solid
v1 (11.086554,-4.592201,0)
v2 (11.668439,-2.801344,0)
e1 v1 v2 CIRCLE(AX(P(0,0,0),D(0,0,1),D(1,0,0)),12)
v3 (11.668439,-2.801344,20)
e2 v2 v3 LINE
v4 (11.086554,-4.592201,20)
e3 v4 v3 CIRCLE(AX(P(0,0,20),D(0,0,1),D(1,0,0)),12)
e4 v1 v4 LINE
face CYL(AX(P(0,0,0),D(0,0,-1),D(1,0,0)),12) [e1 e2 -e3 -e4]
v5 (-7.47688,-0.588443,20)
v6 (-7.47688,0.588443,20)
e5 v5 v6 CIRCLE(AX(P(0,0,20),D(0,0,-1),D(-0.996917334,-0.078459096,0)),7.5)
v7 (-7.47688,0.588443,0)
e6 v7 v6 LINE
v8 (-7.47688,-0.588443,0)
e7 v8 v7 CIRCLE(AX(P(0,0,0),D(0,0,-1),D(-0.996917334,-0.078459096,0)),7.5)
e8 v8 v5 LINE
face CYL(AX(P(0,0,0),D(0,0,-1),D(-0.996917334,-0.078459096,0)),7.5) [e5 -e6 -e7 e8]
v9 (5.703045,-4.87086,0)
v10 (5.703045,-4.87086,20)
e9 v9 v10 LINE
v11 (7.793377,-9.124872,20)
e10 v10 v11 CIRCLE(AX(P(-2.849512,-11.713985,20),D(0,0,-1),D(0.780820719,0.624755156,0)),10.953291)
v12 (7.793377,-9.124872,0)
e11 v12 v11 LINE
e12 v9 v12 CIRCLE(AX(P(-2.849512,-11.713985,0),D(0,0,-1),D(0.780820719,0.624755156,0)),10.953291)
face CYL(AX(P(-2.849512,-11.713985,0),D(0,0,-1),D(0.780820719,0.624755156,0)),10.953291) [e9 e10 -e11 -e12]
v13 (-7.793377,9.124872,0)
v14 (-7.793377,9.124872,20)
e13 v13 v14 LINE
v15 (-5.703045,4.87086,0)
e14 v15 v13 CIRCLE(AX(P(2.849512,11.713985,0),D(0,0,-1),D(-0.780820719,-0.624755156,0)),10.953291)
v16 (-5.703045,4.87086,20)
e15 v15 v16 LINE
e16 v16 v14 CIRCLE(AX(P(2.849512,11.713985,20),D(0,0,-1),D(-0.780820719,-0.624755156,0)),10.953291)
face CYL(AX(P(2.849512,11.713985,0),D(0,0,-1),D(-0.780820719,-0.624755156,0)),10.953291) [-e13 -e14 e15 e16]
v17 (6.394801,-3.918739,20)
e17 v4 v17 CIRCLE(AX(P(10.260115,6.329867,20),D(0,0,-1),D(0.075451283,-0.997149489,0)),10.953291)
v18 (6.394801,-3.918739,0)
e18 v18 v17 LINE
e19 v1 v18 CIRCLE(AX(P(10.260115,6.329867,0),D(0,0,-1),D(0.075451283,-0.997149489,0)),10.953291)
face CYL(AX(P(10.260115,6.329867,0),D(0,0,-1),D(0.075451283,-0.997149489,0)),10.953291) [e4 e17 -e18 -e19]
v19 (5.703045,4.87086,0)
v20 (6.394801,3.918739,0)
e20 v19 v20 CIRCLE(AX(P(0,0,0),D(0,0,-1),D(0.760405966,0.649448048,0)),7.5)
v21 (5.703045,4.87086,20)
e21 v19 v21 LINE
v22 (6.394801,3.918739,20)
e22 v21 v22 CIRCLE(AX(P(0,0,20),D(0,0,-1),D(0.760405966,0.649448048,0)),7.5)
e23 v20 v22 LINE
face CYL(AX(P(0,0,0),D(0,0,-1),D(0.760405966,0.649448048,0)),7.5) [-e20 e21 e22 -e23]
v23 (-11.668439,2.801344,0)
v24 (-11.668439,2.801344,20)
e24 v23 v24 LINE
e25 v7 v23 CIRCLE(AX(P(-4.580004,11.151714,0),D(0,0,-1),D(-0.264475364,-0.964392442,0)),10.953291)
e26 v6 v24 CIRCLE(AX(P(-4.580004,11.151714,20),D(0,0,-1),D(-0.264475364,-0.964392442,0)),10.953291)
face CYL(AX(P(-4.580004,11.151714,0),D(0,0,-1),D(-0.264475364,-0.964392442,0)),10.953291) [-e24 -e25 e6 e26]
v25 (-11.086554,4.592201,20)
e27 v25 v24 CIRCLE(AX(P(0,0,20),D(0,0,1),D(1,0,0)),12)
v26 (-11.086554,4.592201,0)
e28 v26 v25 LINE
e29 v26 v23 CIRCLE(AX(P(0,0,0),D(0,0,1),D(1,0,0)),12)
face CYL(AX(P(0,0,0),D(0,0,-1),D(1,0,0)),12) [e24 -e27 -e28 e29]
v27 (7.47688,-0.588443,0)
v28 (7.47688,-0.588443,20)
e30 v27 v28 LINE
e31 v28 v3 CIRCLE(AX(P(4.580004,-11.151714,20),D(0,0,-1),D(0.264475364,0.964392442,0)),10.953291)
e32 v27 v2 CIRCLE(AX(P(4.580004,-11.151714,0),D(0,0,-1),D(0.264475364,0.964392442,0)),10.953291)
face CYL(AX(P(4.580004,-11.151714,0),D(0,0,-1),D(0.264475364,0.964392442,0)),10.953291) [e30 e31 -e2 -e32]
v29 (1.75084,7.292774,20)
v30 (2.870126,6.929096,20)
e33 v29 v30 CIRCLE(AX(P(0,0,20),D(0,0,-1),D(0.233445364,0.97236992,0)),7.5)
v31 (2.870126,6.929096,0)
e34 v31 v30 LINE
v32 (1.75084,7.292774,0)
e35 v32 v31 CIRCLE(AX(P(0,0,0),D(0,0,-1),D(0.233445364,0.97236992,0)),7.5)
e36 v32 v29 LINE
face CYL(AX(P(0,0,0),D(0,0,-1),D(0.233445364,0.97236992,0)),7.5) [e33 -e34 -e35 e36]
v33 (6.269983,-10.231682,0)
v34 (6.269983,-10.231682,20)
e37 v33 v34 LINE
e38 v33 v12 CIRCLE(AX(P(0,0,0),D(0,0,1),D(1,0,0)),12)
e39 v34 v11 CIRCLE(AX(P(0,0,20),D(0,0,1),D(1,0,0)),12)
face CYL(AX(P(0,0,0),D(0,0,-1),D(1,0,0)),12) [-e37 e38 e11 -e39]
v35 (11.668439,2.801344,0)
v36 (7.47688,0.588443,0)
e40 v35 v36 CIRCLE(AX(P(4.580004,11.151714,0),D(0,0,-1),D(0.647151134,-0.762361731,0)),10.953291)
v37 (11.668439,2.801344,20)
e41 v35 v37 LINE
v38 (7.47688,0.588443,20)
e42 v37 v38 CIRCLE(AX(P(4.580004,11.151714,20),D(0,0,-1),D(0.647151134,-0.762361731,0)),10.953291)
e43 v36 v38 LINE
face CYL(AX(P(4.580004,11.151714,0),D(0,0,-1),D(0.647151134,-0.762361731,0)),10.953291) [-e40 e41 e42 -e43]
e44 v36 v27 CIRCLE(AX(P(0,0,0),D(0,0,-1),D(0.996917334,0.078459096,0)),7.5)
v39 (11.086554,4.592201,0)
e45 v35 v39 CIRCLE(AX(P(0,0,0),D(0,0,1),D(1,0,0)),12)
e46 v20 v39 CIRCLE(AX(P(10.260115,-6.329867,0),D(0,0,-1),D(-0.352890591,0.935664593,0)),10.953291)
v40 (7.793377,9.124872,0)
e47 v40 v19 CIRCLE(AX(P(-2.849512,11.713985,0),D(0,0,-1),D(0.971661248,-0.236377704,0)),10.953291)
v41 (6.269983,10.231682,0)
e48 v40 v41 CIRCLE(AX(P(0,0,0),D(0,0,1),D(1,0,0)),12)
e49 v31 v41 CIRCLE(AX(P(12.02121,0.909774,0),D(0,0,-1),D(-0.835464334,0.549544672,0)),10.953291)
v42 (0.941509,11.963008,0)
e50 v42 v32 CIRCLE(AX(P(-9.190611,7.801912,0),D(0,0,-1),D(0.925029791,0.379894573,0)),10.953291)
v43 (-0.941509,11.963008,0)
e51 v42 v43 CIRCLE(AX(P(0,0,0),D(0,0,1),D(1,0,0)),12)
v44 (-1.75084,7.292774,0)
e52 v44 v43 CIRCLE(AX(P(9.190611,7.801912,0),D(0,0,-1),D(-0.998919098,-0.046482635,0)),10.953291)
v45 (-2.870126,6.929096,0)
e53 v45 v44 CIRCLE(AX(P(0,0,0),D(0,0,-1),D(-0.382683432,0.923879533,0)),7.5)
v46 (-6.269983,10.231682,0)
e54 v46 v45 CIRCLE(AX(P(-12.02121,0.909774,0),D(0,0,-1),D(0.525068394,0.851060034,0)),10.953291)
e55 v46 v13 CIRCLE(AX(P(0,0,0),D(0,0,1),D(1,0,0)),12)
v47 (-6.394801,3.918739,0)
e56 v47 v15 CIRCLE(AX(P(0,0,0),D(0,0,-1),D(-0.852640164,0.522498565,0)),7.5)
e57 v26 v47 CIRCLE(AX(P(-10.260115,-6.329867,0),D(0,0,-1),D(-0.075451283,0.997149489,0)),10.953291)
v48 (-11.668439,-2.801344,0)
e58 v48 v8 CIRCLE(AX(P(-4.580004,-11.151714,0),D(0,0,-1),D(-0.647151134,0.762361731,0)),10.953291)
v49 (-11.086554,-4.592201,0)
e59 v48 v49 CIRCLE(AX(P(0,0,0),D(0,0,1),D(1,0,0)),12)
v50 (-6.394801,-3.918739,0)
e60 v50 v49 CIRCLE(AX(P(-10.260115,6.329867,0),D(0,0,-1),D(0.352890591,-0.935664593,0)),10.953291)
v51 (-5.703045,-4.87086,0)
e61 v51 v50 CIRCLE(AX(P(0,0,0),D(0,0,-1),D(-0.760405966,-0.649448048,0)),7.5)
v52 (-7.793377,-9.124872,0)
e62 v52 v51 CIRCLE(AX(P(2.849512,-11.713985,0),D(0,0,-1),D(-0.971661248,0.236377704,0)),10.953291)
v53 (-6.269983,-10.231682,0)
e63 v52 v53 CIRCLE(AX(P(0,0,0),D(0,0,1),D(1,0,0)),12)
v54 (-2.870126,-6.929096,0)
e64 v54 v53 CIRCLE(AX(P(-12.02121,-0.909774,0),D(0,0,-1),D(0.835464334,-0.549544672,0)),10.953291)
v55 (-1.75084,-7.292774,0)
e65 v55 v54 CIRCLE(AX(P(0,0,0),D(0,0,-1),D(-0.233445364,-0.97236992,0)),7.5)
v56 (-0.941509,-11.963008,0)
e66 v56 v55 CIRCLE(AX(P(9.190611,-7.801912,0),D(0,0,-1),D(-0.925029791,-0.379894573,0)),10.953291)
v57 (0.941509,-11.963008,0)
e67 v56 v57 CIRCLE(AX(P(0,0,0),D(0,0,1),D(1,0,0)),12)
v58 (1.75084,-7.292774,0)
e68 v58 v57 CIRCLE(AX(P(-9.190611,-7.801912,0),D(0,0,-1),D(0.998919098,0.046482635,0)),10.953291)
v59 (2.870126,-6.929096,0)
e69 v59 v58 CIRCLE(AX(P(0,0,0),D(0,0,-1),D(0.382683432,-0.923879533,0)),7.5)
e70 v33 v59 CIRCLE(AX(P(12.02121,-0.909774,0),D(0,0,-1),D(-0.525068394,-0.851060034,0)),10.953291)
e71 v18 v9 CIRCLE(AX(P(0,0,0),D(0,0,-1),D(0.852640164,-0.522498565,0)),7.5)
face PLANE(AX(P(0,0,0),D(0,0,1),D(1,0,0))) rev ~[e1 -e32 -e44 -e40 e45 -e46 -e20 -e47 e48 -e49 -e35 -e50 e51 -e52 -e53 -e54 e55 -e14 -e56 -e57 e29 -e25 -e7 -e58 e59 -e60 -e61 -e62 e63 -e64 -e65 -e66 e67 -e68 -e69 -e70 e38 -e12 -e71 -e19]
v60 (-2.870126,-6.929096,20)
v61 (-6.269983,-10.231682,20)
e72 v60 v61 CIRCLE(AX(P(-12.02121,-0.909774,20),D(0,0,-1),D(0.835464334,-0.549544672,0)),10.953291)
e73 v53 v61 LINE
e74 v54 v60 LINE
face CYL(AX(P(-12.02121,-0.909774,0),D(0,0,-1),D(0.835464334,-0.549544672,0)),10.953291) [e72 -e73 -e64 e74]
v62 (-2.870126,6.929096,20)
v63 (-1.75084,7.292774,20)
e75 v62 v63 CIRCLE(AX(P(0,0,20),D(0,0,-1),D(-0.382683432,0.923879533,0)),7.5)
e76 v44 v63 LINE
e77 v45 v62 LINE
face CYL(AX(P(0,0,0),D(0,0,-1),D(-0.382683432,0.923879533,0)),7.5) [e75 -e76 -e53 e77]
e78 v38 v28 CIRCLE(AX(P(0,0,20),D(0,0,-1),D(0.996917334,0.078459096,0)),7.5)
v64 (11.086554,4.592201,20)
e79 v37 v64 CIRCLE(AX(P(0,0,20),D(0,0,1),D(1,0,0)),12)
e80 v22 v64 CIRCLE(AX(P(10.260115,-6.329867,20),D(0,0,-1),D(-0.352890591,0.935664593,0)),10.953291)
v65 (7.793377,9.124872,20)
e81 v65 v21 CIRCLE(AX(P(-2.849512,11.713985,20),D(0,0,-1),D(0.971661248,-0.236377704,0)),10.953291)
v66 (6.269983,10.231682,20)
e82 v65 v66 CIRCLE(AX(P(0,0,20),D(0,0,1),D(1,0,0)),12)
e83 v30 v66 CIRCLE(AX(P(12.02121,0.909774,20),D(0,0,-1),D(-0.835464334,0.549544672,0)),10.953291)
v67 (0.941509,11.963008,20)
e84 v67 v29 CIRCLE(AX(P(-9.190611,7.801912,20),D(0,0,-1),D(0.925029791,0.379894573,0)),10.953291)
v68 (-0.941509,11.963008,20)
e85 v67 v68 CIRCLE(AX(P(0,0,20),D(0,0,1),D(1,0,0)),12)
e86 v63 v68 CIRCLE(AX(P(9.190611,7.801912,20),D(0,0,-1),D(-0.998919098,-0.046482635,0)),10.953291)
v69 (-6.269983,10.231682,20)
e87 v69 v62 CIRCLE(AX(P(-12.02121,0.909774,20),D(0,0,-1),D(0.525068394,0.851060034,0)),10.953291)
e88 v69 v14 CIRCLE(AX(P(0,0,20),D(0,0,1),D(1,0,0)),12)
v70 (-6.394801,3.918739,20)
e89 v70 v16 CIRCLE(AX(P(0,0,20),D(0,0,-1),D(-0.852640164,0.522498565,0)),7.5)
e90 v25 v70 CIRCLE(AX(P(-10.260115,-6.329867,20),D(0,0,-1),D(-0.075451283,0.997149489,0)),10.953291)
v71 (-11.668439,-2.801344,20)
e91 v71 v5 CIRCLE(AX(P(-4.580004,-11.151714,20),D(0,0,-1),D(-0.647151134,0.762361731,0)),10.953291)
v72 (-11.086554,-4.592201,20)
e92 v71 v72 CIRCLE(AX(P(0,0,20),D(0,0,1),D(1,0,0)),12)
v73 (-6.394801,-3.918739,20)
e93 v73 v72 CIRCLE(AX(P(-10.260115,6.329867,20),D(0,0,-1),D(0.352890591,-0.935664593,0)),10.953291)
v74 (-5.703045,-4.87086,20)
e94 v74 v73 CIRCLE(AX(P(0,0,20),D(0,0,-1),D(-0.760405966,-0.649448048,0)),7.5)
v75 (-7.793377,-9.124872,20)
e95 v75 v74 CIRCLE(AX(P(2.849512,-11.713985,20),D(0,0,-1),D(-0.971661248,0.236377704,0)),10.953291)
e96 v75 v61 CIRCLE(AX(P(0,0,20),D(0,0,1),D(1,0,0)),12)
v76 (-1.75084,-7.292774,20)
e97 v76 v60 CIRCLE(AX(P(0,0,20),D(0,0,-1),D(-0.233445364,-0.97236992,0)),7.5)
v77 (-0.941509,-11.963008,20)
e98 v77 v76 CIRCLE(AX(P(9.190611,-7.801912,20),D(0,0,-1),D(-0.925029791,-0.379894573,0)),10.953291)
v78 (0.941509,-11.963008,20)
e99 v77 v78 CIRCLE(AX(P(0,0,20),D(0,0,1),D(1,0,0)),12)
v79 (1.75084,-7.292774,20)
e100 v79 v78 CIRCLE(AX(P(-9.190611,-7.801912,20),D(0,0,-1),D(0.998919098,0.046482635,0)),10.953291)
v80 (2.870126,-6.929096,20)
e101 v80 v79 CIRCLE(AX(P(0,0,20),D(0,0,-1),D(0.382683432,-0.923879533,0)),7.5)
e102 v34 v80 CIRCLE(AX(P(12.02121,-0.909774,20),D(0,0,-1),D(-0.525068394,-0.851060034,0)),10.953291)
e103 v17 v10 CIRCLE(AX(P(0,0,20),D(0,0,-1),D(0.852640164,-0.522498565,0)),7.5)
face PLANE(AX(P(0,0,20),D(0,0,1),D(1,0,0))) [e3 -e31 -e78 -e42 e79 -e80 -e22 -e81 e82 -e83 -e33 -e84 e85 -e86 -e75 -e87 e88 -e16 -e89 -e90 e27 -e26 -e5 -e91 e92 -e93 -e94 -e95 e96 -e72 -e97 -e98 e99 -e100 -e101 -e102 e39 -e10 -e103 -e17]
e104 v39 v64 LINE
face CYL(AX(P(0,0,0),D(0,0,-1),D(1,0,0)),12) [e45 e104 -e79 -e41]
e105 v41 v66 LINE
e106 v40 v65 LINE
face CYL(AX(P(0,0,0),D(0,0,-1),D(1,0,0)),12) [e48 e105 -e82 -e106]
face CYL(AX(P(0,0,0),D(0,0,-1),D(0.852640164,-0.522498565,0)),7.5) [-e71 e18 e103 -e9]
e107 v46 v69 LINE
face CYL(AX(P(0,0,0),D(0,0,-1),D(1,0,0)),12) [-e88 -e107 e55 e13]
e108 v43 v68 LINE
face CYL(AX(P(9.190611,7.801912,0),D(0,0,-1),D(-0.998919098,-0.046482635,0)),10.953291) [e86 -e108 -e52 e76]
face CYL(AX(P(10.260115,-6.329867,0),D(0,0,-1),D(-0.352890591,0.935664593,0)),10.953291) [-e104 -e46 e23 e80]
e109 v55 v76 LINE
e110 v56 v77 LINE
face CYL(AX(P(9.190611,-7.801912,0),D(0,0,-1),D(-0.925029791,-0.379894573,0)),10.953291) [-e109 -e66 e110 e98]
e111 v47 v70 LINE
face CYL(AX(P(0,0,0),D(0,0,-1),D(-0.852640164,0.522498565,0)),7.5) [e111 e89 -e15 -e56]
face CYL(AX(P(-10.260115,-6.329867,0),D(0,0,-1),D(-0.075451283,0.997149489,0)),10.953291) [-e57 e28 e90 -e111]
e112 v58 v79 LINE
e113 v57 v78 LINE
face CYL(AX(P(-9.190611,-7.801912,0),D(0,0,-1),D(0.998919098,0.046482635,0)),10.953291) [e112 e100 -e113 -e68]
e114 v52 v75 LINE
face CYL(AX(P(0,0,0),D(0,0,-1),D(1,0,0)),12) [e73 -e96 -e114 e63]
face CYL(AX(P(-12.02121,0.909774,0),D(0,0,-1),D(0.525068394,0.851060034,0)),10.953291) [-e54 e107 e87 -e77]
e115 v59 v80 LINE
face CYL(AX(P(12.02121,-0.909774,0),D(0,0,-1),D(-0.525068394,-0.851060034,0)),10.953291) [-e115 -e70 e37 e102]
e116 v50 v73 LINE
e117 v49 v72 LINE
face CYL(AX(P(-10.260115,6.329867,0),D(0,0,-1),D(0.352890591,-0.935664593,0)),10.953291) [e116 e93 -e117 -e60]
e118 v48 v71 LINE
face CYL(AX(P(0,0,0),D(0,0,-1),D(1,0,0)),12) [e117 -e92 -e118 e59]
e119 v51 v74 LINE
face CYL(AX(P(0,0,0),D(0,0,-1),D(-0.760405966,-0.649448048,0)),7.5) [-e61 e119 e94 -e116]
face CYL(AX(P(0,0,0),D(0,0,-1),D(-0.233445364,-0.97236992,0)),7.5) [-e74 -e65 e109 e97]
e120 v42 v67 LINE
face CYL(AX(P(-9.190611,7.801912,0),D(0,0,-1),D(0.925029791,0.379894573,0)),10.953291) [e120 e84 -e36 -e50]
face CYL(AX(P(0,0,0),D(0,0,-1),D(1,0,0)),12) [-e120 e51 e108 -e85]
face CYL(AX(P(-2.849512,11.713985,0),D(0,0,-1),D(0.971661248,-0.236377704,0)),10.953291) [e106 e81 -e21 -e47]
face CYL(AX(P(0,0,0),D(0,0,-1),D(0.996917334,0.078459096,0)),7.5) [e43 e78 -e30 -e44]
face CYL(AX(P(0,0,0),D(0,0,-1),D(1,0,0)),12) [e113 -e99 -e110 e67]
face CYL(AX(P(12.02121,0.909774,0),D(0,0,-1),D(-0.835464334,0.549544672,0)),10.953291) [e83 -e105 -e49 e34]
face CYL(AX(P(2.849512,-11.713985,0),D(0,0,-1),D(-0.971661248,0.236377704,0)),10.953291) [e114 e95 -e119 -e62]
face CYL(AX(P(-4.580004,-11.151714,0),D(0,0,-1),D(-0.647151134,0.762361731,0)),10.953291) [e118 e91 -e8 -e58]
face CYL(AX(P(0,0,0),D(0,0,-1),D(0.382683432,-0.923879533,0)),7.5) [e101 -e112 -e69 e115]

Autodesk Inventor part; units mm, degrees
sketch "Sketch1" plane through (0, 0, 0) normal (0, 0, 1) x (1, 0, 0)
  circle A0 centre (0, 0) radius 12
  dimension "d0" = 24
extrude "Extrusion1" add sketch "Sketch1" along normal blind 20
ref_plane "Work Plane2" through (0, 0, 10) normal (0, 0, 1) x (1, 0, 0)
sketch "Sketch2" plane through (0, 0, 0) normal (0, 0, -1) x (-1, 0, 0)
  circle A0 centre (0, 0) radius 12 projected
  circle A1 centre (0, 0) radius 10
  dimension "d3" = 20
surface extrude "Pitch Diameter" sketch "Sketch2" against normal through all shown no curves A1
ref_plane "Work Plane8" through (0, 0, 0) normal (0.9510565, 0.309017, 0) x (0, 0, 1)
ref_plane "Work Plane9" through (0, 0, 0) normal (1, 0, 0) x (0, 1, 0)
spur gear teeth "Spur Gear" teeth 10 pitch diameter 20 tip diameter 24 root diameter 15 face width 20 start plane through (0, 0, 0) normal (0, 0, -1) x (-1, 0, 0)
equation "\"d0\" = da_da"
equation "\"d1\" = da_b"
equation "\"d3\" = da_d"
equation "\"d16\" = da_aw"
equation "\"d43\" = da_aw"
equation "\"d46\" = da_aw"
equation "\"da_da\" = 24"
equation "\"da_b\" = 20"
equation "\"da_d\" = 20"
equation "\"da_aw\" = 36"
properties part number "Spur Gear1" material "Steel"
